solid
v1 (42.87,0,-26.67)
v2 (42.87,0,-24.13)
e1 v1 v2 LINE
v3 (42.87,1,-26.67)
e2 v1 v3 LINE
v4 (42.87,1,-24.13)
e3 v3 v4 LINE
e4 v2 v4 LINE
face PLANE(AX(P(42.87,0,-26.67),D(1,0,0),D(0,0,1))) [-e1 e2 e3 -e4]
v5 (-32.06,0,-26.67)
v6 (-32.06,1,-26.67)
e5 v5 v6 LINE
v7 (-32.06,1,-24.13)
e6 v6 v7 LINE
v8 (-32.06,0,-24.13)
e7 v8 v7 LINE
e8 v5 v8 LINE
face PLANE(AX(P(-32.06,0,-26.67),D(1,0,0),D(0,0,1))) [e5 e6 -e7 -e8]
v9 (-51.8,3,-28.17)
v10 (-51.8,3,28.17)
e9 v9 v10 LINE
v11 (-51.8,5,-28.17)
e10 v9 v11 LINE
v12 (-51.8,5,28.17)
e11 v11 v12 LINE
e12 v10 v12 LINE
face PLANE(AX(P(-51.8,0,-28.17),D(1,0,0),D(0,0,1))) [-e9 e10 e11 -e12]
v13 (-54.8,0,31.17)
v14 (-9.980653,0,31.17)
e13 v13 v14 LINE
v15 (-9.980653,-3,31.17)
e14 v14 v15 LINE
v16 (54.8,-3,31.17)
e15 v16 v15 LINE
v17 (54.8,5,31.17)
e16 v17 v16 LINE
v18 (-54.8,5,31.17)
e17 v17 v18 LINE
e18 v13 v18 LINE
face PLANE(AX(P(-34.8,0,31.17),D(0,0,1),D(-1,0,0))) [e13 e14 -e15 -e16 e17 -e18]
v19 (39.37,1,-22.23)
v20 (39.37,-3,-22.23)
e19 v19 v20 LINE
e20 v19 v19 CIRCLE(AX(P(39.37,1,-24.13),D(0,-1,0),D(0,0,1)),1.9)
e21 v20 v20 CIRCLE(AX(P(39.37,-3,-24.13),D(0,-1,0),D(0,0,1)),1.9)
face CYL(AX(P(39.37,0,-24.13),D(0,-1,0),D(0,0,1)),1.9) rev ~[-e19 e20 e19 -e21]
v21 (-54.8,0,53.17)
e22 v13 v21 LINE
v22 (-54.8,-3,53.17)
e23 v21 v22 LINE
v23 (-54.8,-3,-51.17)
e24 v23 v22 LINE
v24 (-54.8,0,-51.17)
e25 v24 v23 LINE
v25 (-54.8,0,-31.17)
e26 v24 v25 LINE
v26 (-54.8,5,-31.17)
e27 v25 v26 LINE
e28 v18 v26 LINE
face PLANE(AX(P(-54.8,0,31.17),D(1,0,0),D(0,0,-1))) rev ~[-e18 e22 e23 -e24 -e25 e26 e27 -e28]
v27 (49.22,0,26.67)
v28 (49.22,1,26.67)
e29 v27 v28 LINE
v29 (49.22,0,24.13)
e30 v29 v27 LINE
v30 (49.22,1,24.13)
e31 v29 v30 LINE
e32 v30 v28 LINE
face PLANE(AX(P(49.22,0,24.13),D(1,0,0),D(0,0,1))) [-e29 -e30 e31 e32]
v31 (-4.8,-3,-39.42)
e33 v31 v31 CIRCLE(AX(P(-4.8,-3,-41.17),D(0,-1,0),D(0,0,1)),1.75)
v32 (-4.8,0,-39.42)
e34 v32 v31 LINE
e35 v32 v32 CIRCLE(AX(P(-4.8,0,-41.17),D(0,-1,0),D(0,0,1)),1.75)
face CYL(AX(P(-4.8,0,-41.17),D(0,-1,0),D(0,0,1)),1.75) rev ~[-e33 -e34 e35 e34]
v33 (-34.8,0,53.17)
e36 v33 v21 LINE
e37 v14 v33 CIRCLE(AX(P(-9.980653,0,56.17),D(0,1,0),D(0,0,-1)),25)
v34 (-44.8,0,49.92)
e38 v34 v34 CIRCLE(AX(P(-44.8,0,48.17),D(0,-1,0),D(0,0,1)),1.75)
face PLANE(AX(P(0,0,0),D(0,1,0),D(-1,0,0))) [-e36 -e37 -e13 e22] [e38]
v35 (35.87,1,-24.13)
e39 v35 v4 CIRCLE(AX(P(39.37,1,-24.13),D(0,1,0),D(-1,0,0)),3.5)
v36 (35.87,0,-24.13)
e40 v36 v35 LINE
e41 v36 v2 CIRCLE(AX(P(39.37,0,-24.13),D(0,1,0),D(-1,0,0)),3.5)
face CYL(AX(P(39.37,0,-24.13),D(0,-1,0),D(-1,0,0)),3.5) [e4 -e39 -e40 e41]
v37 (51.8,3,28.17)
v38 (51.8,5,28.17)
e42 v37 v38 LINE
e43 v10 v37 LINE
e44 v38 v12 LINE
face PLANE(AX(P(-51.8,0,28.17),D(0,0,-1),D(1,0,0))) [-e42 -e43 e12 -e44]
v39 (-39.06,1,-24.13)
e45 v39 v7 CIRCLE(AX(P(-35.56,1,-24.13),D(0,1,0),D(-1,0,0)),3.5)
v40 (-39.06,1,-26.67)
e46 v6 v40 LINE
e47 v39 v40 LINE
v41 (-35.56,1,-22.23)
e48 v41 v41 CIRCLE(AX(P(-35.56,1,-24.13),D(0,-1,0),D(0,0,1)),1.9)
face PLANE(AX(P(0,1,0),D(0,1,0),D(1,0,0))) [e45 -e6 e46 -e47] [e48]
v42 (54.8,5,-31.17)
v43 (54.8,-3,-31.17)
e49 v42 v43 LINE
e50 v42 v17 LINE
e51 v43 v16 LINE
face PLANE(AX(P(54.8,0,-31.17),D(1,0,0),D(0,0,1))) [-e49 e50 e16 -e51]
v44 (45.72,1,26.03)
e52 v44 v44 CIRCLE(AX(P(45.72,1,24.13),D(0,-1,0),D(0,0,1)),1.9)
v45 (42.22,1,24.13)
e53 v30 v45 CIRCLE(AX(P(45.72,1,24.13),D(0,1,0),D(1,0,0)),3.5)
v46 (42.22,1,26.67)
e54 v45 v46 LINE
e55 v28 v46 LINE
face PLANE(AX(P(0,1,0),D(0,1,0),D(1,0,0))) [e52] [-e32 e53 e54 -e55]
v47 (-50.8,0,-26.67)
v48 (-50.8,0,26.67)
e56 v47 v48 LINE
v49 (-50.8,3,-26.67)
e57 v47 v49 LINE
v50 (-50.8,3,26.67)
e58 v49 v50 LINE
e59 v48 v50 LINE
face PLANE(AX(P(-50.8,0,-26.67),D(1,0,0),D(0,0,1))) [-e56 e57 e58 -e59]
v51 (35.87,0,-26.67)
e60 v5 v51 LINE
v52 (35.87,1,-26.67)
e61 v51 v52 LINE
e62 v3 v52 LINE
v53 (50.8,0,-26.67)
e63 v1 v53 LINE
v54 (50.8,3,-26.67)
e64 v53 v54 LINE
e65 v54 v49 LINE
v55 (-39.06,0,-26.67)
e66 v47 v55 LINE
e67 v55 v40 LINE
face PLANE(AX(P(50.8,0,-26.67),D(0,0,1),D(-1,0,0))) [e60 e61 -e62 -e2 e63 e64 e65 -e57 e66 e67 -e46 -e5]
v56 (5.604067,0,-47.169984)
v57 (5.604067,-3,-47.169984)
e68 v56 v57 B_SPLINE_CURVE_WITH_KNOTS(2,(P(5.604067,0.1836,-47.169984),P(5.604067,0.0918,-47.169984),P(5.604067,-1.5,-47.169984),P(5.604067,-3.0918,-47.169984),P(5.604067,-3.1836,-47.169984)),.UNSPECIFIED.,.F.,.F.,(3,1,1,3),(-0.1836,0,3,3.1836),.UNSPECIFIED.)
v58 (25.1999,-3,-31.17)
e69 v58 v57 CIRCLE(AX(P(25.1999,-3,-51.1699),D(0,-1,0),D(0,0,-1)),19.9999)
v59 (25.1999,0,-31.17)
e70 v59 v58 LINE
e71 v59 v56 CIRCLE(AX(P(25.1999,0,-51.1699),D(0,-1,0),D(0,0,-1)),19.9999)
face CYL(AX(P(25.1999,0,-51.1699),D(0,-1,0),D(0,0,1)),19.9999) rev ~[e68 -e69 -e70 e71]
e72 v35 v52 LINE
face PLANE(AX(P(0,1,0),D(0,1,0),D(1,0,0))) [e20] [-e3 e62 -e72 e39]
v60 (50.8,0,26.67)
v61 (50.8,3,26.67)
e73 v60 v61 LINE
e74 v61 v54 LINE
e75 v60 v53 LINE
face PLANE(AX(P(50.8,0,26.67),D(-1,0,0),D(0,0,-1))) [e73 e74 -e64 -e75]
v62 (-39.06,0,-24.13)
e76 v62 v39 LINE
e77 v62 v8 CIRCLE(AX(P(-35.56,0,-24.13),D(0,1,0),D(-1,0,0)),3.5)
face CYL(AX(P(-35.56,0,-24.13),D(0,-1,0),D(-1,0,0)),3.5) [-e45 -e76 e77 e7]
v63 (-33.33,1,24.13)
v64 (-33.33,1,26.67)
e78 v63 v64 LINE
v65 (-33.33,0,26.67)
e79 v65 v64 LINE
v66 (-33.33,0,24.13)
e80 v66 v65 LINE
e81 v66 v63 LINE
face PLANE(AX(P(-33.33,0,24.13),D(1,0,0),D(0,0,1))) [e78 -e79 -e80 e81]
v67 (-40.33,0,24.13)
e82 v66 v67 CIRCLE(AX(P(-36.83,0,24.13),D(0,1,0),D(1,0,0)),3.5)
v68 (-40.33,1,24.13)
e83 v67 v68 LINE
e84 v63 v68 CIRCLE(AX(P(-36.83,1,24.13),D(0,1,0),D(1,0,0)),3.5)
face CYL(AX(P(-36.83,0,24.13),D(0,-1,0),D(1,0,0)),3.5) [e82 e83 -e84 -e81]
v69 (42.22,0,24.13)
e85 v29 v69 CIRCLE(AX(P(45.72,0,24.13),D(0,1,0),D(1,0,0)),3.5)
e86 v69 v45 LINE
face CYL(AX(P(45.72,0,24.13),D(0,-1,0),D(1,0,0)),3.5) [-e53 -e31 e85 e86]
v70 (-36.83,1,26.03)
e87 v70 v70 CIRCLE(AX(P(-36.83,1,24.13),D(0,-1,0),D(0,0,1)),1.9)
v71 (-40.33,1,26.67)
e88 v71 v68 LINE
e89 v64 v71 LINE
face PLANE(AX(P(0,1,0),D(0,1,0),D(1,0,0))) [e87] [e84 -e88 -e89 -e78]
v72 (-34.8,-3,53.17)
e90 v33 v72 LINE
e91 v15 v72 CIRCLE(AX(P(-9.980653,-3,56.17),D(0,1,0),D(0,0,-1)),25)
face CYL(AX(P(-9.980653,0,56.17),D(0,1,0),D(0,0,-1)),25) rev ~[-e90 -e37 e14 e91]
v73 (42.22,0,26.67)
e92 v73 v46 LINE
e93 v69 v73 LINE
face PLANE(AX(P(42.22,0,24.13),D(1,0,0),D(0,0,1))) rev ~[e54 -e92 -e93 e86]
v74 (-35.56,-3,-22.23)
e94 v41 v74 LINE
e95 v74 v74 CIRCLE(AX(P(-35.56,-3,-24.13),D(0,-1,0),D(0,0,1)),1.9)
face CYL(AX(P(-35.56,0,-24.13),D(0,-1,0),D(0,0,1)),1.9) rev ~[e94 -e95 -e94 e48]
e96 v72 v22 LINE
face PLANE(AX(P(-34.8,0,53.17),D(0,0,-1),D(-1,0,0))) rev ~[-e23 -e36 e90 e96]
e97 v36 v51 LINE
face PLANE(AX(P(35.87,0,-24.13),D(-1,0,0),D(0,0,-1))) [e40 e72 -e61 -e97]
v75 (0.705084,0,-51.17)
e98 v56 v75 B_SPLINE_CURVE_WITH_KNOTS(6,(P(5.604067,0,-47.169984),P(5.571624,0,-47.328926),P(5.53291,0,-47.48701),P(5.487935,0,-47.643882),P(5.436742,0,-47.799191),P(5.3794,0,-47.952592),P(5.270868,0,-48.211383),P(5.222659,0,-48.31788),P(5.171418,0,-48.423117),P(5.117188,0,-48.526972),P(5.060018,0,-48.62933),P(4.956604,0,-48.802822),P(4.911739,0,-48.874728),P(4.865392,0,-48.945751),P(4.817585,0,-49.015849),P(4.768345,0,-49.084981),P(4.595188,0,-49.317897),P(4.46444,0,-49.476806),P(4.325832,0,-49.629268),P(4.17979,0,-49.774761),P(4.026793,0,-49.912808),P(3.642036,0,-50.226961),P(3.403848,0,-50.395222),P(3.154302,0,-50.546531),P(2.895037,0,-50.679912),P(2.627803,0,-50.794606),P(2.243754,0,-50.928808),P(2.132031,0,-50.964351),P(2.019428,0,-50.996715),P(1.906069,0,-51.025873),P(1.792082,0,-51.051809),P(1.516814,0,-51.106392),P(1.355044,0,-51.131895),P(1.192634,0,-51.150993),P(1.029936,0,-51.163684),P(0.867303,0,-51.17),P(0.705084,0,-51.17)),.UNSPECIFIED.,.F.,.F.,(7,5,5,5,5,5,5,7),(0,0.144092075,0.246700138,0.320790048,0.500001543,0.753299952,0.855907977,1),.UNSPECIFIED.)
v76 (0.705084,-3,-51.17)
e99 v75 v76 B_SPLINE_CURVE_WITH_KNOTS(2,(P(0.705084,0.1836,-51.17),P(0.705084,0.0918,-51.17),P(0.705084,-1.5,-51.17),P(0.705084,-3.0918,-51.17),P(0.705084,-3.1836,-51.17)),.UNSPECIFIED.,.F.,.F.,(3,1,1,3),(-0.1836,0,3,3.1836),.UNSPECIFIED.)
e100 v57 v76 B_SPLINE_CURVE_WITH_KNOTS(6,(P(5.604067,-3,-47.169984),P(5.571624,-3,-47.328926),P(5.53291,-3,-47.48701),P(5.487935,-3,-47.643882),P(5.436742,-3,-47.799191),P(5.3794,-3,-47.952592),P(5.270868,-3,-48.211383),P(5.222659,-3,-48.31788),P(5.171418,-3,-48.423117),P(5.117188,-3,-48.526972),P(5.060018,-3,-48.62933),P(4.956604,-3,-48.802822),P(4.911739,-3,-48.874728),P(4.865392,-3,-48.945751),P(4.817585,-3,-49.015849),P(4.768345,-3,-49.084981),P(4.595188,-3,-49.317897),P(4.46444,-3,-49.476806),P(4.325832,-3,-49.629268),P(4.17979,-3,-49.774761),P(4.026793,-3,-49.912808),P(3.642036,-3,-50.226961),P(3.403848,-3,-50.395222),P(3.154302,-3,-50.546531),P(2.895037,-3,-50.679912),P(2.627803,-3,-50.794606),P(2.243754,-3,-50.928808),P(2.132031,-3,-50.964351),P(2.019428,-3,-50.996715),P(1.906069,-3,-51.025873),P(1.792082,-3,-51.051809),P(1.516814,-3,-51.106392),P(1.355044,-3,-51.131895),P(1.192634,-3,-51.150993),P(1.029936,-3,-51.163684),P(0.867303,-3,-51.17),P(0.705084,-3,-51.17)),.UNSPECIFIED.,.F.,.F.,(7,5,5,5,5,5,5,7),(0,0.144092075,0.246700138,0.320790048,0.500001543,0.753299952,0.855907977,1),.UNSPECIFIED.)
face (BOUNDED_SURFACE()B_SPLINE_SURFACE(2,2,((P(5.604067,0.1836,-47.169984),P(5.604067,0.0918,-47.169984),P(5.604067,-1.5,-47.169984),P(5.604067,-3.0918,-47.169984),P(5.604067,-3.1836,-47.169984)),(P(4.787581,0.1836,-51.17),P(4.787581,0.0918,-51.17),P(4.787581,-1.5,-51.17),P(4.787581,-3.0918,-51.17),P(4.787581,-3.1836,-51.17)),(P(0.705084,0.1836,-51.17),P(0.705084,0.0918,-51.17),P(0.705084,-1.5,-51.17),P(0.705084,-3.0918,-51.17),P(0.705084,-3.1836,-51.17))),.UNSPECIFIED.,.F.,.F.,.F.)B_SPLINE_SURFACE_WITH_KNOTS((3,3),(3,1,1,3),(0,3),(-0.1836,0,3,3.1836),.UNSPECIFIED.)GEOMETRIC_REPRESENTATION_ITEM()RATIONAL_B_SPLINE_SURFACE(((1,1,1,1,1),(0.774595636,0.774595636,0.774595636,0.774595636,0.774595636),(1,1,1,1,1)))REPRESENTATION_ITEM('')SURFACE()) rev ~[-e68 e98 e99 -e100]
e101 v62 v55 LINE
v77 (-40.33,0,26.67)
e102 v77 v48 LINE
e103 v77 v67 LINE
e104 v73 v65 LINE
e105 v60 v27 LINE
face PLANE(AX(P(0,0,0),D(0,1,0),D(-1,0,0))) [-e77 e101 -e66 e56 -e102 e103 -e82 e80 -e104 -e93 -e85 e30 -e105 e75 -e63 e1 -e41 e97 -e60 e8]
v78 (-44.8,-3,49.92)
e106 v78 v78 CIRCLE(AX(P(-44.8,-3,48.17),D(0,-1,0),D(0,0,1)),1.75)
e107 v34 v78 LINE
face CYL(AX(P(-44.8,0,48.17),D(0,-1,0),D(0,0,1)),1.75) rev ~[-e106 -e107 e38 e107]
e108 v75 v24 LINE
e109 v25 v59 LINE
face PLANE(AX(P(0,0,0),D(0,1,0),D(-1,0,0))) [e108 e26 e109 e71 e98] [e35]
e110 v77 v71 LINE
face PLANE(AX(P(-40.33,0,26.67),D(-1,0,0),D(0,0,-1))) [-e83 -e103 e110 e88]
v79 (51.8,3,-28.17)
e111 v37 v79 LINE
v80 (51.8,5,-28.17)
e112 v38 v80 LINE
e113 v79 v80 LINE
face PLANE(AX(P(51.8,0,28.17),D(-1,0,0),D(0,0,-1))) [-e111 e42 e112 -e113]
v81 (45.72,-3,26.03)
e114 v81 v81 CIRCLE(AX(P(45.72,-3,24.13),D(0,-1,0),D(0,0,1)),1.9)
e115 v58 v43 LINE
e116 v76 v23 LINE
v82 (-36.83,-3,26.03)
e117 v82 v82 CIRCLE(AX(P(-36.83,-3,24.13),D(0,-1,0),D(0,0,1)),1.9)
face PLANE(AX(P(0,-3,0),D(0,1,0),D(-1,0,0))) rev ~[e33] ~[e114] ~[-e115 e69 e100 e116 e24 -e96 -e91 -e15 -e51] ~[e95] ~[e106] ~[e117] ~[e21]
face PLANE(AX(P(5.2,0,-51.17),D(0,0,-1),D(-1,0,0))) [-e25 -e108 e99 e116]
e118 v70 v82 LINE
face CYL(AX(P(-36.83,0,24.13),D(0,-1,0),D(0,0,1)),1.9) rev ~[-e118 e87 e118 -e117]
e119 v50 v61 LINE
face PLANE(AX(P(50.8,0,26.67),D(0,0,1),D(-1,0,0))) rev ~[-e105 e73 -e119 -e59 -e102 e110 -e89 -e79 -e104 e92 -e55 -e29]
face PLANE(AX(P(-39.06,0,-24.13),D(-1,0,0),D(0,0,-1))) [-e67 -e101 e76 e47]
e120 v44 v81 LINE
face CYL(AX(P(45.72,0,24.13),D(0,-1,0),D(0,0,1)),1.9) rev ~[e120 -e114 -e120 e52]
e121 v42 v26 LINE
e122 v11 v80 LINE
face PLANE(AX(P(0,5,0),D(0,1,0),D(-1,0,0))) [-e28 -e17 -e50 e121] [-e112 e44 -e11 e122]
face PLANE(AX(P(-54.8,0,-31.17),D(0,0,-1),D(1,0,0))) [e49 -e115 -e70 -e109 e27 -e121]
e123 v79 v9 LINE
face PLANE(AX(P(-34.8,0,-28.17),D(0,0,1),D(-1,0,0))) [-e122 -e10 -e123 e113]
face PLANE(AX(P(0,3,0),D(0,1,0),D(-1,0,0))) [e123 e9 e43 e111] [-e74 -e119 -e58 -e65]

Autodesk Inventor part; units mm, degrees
ref_plane "YZ Plane" through (0, 0, 0) normal (1, 0, 0) x (0, 1, 0)
ref_plane "XZ Plane" through (0, 0, 0) normal (0, 1, 0) x (-1, 0, 0)
ref_plane "XY Plane" through (0, 0, 0) normal (0, 0, 1) x (1, 0, 0)
sketch "Sketch1" plane through (0, 0, 0) normal (0, 1, 0) x (-1, 0, 0)
  line L0 (-50.8, 26.67) -> (-50.8, -26.67)
  line L1 (-50.8, -26.67) -> (50.8, -26.67)
  line L2 (50.8, -26.67) -> (50.8, 26.67)
  line L3 (50.8, 26.67) -> (-50.8, -26.67) construction
  line L4 (50.8, -26.67) -> (-50.8, 26.67) construction
  line L5 (51.8, 28.17) -> (-51.8, 28.17)
  line L6 (-51.8, 28.17) -> (-51.8, -28.17)
  line L7 (-51.8, -28.17) -> (51.8, -28.17)
  line L8 (51.8, -28.17) -> (51.8, 28.17)
  line L9 (51.8, 28.17) -> (-51.8, -28.17) construction
  line L10 (-51.8, 28.17) -> (51.8, -28.17) construction
  line L11 (-54.8, 31.17) -> (54.8, 31.17)
  line L12 (54.8, 31.17) -> (54.8, -31.17)
  line L13 (54.8, -31.17) -> (-54.8, -31.17)
  line L14 (-54.8, -31.17) -> (-54.8, 31.17)
  line L15 (-54.8, 31.17) -> (54.8, -31.17) construction
  line L16 (54.8, 31.17) -> (-54.8, -31.17) construction
  line L17 (54.8, -31.17) -> (-5.2, -31.17)
  line L18 (-5.2, -31.17) -> (-5.2, -51.17)
  line L19 (-5.2, -51.17) -> (54.8, -51.17)
  line L20 (54.8, -51.17) -> (54.8, -31.17)
  line L21 (54.8, -51.17) -> (34.8, -51.17)
  line L22 (-41.91, -26.67) -> (-36.83, -26.67)
  line L23 (38.1, -26.67) -> (33.02, -26.67)
  line L24 (54.8, -51.17) -> (34.8, -51.17)
  line L25 (34.8, -51.17) -> (34.8, 53.17)
  line L26 (34.8, 53.17) -> (54.8, 53.17)
  line L27 (54.8, 53.17) -> (54.8, -51.17)
  line L28 (-50.8, 26.67) -> (50.8, 26.67)
  point P0 (0, 0)
  point P1 (36.83, 24.13)
  point P2 (-45.72, 24.13)
  point P3 (-45.72, 24.13)
  point P4 (-39.37, -24.13)
  point P5 (35.56, -24.13)
  point P6 (0, 0)
  point P7 (0, 0)
  dimension "d0" = 101.6
  dimension "d1" = 53.34
  dimension "d2" = 13.97
  dimension "d4" = 96.52
  dimension "d5" = 90.17
  dimension "d7" = 15.24
  dimension "d8" = 101.6
  dimension "d11" = 103.6
  dimension "d12" = 56.34
  dimension "d13" = 62.34
  dimension "d14" = 109.6
  dimension "d15" = 20
  dimension "d25" = 60
  dimension "d31" = 20
  dimension "d33" = 0
  dimension "d60" = 25
extrude "Extrusion1" add sketch "Sketch1" against normal blind 3
extrude "Extrusion2" add sketch "Sketch1" along normal blind 5 contours L25 L11 L12 L13 L7 L8 L5 | L5 L6 L7 L25 L13 L14 L11
extrude "Extrusion6" add sketch "Sketch1" along normal blind 3 contours L0 L1 L25 L7 L6 L5 L28 | L25 L5 L8 L7 L1 L2 L28
sketch "Sketch5" plane through (0, 0, 0) normal (0, 1, 0) x (1, 0, 0)
  line L0 (50.8, -26.67) -> (-50.8, -26.67) projected
  arc A0 (-33.33, -24.13) -> (-40.33, -24.13) centre (-36.83, -24.13) ccw
  line L1 (-33.33, -24.13) -> (-33.33, -26.67)
  line L2 (-33.33, -26.67) -> (-40.33, -26.67)
  line L3 (-40.33, -26.67) -> (-40.33, -24.13)
  arc A1 (49.22, -24.13) -> (42.22, -24.13) centre (45.72, -24.13) ccw
  line L4 (42.22, -24.13) -> (42.22, -26.67)
  line L5 (-50.8, -26.67) -> (50.8, -26.67) projected
  line L6 (49.22, -24.13) -> (49.22, -26.67)
  line L7 (49.22, -26.67) -> (42.22, -26.67)
  arc A2 (35.87, 24.13) -> (42.87, 24.13) centre (39.37, 24.13) ccw
  line L8 (35.87, 24.13) -> (35.87, 26.67)
  line L9 (50.8, 26.67) -> (-50.8, 26.67) projected
  line L10 (35.87, 26.67) -> (42.87, 26.67)
  line L11 (42.87, 26.67) -> (42.87, 24.13)
  arc A3 (-39.06, 24.13) -> (-32.06, 24.13) centre (-35.56, 24.13) ccw
  line L12 (-39.06, 24.13) -> (-39.06, 26.67)
  line L13 (-39.06, 26.67) -> (-32.06, 26.67)
  line L14 (-32.06, 26.67) -> (-32.06, 24.13)
  point P0 (0, 0)
  dimension "d64" = 7
  dimension "d65" = 7
  dimension "d68" = 7
  dimension "d69" = 7
  dimension "d70" = 7
extrude "Extrusion7" add sketch "Sketch5" along normal blind 1
hole "Hole3" at (-36.83, 0, 24.13) at (-35.56, 0, -24.13) at (39.37, 0, -24.13) at (45.72, 0, 24.13) direction (0, -1, 0) diameter 3.8 end through all
sketch "Sketch6" plane through (0, 1, 0) normal (0, 1, 0) x (1, 0, 0)
  point P0 (0, 0)
  point P1 (-36.83, -24.13)
  point P2 (-35.56, 24.13)
  point P3 (39.37, 24.13)
  point P4 (45.72, -24.13)
hole "Hole4" at (-36.83, 1, 24.13) at (-35.56, 1, -24.13) at (39.37, 1, -24.13) at (45.72, 1, 24.13) direction (0, -1, 0) diameter 3.8 end through all
fillet "Fillet1" radius 25 1 edges at (-34.8, -1.5, 31.17)
fillet "Fillet2" radius 20 1 edges at (5.2, -1.5, -31.17)
fillet "Fillet3" radius 5 2 edges at (5.2, -1.5, -51.17) (-9.9807, -1.5, 31.17)
sketch "Sketch2" plane through (0, 0, 0) normal (0, 1, 0) x (1, 0, 0)
  line L0 (-34.8, -53.17) -> (-54.8, -53.17) projected
  line L1 (5.2, 31.17) -> (5.2, 51.17) projected
  line L2 (-54.8, 51.17) -> (-34.8, 51.17) projected
  circle A0 centre (-44.8, -48.17) radius 5
  circle A1 centre (-44.8, 41.17) radius 5
  circle A2 centre (-4.8, 41.17) radius 5
  line L3 (-49.8, -48.17) -> (-49.8, -53.17)
  line L4 (-39.8, -48.17) -> (-39.8, -53.17)
  line L5 (-34.8, -53.17) -> (-54.8, -53.17) projected
  line L6 (-39.8, -53.17) -> (-49.8, -53.17)
  line L7 (-54.8, 31.17) -> (-54.8, 51.17) projected
  line L8 (-54.8, -53.17) -> (-54.8, -31.17) projected
  point P0 (0, 0)
  point P1 (-36.8, -56.83)
  dimension "d35" = 5
  dimension "d37" = 10
  dimension "d38" = 10
  dimension "d39" = 10
  dimension "d40" = 10
  dimension "d41" = 10
  dimension "d42" = 10
  dimension "d85" = 10
  dimension "d86" = 10
hole "Hole5" at (-44.8, 0, 48.17) at (-4.8, 0, -41.17) direction (0, -1, 0) diameter 3.5 end through all
sketch "Sketch3" plane through (-44.8, 2, 48.17) normal (0, 1, 0) x (-1, 0, 0)
  arc A0 (-5, 0) -> (5, 0) centre (0, 0) ccw projected
  circle A1 centre (0, -89.34) radius 5 projected
  circle A2 centre (-40, -89.34) radius 5 projected
  line L0 (5, 5) -> (-5, 5) projected
  line L1 (-5, 5) -> (-5, 0) projected
  line L2 (5, 0) -> (5, 5) projected
  point P0 (-44.8, -48.17)
properties part number "support arduino_v2"
